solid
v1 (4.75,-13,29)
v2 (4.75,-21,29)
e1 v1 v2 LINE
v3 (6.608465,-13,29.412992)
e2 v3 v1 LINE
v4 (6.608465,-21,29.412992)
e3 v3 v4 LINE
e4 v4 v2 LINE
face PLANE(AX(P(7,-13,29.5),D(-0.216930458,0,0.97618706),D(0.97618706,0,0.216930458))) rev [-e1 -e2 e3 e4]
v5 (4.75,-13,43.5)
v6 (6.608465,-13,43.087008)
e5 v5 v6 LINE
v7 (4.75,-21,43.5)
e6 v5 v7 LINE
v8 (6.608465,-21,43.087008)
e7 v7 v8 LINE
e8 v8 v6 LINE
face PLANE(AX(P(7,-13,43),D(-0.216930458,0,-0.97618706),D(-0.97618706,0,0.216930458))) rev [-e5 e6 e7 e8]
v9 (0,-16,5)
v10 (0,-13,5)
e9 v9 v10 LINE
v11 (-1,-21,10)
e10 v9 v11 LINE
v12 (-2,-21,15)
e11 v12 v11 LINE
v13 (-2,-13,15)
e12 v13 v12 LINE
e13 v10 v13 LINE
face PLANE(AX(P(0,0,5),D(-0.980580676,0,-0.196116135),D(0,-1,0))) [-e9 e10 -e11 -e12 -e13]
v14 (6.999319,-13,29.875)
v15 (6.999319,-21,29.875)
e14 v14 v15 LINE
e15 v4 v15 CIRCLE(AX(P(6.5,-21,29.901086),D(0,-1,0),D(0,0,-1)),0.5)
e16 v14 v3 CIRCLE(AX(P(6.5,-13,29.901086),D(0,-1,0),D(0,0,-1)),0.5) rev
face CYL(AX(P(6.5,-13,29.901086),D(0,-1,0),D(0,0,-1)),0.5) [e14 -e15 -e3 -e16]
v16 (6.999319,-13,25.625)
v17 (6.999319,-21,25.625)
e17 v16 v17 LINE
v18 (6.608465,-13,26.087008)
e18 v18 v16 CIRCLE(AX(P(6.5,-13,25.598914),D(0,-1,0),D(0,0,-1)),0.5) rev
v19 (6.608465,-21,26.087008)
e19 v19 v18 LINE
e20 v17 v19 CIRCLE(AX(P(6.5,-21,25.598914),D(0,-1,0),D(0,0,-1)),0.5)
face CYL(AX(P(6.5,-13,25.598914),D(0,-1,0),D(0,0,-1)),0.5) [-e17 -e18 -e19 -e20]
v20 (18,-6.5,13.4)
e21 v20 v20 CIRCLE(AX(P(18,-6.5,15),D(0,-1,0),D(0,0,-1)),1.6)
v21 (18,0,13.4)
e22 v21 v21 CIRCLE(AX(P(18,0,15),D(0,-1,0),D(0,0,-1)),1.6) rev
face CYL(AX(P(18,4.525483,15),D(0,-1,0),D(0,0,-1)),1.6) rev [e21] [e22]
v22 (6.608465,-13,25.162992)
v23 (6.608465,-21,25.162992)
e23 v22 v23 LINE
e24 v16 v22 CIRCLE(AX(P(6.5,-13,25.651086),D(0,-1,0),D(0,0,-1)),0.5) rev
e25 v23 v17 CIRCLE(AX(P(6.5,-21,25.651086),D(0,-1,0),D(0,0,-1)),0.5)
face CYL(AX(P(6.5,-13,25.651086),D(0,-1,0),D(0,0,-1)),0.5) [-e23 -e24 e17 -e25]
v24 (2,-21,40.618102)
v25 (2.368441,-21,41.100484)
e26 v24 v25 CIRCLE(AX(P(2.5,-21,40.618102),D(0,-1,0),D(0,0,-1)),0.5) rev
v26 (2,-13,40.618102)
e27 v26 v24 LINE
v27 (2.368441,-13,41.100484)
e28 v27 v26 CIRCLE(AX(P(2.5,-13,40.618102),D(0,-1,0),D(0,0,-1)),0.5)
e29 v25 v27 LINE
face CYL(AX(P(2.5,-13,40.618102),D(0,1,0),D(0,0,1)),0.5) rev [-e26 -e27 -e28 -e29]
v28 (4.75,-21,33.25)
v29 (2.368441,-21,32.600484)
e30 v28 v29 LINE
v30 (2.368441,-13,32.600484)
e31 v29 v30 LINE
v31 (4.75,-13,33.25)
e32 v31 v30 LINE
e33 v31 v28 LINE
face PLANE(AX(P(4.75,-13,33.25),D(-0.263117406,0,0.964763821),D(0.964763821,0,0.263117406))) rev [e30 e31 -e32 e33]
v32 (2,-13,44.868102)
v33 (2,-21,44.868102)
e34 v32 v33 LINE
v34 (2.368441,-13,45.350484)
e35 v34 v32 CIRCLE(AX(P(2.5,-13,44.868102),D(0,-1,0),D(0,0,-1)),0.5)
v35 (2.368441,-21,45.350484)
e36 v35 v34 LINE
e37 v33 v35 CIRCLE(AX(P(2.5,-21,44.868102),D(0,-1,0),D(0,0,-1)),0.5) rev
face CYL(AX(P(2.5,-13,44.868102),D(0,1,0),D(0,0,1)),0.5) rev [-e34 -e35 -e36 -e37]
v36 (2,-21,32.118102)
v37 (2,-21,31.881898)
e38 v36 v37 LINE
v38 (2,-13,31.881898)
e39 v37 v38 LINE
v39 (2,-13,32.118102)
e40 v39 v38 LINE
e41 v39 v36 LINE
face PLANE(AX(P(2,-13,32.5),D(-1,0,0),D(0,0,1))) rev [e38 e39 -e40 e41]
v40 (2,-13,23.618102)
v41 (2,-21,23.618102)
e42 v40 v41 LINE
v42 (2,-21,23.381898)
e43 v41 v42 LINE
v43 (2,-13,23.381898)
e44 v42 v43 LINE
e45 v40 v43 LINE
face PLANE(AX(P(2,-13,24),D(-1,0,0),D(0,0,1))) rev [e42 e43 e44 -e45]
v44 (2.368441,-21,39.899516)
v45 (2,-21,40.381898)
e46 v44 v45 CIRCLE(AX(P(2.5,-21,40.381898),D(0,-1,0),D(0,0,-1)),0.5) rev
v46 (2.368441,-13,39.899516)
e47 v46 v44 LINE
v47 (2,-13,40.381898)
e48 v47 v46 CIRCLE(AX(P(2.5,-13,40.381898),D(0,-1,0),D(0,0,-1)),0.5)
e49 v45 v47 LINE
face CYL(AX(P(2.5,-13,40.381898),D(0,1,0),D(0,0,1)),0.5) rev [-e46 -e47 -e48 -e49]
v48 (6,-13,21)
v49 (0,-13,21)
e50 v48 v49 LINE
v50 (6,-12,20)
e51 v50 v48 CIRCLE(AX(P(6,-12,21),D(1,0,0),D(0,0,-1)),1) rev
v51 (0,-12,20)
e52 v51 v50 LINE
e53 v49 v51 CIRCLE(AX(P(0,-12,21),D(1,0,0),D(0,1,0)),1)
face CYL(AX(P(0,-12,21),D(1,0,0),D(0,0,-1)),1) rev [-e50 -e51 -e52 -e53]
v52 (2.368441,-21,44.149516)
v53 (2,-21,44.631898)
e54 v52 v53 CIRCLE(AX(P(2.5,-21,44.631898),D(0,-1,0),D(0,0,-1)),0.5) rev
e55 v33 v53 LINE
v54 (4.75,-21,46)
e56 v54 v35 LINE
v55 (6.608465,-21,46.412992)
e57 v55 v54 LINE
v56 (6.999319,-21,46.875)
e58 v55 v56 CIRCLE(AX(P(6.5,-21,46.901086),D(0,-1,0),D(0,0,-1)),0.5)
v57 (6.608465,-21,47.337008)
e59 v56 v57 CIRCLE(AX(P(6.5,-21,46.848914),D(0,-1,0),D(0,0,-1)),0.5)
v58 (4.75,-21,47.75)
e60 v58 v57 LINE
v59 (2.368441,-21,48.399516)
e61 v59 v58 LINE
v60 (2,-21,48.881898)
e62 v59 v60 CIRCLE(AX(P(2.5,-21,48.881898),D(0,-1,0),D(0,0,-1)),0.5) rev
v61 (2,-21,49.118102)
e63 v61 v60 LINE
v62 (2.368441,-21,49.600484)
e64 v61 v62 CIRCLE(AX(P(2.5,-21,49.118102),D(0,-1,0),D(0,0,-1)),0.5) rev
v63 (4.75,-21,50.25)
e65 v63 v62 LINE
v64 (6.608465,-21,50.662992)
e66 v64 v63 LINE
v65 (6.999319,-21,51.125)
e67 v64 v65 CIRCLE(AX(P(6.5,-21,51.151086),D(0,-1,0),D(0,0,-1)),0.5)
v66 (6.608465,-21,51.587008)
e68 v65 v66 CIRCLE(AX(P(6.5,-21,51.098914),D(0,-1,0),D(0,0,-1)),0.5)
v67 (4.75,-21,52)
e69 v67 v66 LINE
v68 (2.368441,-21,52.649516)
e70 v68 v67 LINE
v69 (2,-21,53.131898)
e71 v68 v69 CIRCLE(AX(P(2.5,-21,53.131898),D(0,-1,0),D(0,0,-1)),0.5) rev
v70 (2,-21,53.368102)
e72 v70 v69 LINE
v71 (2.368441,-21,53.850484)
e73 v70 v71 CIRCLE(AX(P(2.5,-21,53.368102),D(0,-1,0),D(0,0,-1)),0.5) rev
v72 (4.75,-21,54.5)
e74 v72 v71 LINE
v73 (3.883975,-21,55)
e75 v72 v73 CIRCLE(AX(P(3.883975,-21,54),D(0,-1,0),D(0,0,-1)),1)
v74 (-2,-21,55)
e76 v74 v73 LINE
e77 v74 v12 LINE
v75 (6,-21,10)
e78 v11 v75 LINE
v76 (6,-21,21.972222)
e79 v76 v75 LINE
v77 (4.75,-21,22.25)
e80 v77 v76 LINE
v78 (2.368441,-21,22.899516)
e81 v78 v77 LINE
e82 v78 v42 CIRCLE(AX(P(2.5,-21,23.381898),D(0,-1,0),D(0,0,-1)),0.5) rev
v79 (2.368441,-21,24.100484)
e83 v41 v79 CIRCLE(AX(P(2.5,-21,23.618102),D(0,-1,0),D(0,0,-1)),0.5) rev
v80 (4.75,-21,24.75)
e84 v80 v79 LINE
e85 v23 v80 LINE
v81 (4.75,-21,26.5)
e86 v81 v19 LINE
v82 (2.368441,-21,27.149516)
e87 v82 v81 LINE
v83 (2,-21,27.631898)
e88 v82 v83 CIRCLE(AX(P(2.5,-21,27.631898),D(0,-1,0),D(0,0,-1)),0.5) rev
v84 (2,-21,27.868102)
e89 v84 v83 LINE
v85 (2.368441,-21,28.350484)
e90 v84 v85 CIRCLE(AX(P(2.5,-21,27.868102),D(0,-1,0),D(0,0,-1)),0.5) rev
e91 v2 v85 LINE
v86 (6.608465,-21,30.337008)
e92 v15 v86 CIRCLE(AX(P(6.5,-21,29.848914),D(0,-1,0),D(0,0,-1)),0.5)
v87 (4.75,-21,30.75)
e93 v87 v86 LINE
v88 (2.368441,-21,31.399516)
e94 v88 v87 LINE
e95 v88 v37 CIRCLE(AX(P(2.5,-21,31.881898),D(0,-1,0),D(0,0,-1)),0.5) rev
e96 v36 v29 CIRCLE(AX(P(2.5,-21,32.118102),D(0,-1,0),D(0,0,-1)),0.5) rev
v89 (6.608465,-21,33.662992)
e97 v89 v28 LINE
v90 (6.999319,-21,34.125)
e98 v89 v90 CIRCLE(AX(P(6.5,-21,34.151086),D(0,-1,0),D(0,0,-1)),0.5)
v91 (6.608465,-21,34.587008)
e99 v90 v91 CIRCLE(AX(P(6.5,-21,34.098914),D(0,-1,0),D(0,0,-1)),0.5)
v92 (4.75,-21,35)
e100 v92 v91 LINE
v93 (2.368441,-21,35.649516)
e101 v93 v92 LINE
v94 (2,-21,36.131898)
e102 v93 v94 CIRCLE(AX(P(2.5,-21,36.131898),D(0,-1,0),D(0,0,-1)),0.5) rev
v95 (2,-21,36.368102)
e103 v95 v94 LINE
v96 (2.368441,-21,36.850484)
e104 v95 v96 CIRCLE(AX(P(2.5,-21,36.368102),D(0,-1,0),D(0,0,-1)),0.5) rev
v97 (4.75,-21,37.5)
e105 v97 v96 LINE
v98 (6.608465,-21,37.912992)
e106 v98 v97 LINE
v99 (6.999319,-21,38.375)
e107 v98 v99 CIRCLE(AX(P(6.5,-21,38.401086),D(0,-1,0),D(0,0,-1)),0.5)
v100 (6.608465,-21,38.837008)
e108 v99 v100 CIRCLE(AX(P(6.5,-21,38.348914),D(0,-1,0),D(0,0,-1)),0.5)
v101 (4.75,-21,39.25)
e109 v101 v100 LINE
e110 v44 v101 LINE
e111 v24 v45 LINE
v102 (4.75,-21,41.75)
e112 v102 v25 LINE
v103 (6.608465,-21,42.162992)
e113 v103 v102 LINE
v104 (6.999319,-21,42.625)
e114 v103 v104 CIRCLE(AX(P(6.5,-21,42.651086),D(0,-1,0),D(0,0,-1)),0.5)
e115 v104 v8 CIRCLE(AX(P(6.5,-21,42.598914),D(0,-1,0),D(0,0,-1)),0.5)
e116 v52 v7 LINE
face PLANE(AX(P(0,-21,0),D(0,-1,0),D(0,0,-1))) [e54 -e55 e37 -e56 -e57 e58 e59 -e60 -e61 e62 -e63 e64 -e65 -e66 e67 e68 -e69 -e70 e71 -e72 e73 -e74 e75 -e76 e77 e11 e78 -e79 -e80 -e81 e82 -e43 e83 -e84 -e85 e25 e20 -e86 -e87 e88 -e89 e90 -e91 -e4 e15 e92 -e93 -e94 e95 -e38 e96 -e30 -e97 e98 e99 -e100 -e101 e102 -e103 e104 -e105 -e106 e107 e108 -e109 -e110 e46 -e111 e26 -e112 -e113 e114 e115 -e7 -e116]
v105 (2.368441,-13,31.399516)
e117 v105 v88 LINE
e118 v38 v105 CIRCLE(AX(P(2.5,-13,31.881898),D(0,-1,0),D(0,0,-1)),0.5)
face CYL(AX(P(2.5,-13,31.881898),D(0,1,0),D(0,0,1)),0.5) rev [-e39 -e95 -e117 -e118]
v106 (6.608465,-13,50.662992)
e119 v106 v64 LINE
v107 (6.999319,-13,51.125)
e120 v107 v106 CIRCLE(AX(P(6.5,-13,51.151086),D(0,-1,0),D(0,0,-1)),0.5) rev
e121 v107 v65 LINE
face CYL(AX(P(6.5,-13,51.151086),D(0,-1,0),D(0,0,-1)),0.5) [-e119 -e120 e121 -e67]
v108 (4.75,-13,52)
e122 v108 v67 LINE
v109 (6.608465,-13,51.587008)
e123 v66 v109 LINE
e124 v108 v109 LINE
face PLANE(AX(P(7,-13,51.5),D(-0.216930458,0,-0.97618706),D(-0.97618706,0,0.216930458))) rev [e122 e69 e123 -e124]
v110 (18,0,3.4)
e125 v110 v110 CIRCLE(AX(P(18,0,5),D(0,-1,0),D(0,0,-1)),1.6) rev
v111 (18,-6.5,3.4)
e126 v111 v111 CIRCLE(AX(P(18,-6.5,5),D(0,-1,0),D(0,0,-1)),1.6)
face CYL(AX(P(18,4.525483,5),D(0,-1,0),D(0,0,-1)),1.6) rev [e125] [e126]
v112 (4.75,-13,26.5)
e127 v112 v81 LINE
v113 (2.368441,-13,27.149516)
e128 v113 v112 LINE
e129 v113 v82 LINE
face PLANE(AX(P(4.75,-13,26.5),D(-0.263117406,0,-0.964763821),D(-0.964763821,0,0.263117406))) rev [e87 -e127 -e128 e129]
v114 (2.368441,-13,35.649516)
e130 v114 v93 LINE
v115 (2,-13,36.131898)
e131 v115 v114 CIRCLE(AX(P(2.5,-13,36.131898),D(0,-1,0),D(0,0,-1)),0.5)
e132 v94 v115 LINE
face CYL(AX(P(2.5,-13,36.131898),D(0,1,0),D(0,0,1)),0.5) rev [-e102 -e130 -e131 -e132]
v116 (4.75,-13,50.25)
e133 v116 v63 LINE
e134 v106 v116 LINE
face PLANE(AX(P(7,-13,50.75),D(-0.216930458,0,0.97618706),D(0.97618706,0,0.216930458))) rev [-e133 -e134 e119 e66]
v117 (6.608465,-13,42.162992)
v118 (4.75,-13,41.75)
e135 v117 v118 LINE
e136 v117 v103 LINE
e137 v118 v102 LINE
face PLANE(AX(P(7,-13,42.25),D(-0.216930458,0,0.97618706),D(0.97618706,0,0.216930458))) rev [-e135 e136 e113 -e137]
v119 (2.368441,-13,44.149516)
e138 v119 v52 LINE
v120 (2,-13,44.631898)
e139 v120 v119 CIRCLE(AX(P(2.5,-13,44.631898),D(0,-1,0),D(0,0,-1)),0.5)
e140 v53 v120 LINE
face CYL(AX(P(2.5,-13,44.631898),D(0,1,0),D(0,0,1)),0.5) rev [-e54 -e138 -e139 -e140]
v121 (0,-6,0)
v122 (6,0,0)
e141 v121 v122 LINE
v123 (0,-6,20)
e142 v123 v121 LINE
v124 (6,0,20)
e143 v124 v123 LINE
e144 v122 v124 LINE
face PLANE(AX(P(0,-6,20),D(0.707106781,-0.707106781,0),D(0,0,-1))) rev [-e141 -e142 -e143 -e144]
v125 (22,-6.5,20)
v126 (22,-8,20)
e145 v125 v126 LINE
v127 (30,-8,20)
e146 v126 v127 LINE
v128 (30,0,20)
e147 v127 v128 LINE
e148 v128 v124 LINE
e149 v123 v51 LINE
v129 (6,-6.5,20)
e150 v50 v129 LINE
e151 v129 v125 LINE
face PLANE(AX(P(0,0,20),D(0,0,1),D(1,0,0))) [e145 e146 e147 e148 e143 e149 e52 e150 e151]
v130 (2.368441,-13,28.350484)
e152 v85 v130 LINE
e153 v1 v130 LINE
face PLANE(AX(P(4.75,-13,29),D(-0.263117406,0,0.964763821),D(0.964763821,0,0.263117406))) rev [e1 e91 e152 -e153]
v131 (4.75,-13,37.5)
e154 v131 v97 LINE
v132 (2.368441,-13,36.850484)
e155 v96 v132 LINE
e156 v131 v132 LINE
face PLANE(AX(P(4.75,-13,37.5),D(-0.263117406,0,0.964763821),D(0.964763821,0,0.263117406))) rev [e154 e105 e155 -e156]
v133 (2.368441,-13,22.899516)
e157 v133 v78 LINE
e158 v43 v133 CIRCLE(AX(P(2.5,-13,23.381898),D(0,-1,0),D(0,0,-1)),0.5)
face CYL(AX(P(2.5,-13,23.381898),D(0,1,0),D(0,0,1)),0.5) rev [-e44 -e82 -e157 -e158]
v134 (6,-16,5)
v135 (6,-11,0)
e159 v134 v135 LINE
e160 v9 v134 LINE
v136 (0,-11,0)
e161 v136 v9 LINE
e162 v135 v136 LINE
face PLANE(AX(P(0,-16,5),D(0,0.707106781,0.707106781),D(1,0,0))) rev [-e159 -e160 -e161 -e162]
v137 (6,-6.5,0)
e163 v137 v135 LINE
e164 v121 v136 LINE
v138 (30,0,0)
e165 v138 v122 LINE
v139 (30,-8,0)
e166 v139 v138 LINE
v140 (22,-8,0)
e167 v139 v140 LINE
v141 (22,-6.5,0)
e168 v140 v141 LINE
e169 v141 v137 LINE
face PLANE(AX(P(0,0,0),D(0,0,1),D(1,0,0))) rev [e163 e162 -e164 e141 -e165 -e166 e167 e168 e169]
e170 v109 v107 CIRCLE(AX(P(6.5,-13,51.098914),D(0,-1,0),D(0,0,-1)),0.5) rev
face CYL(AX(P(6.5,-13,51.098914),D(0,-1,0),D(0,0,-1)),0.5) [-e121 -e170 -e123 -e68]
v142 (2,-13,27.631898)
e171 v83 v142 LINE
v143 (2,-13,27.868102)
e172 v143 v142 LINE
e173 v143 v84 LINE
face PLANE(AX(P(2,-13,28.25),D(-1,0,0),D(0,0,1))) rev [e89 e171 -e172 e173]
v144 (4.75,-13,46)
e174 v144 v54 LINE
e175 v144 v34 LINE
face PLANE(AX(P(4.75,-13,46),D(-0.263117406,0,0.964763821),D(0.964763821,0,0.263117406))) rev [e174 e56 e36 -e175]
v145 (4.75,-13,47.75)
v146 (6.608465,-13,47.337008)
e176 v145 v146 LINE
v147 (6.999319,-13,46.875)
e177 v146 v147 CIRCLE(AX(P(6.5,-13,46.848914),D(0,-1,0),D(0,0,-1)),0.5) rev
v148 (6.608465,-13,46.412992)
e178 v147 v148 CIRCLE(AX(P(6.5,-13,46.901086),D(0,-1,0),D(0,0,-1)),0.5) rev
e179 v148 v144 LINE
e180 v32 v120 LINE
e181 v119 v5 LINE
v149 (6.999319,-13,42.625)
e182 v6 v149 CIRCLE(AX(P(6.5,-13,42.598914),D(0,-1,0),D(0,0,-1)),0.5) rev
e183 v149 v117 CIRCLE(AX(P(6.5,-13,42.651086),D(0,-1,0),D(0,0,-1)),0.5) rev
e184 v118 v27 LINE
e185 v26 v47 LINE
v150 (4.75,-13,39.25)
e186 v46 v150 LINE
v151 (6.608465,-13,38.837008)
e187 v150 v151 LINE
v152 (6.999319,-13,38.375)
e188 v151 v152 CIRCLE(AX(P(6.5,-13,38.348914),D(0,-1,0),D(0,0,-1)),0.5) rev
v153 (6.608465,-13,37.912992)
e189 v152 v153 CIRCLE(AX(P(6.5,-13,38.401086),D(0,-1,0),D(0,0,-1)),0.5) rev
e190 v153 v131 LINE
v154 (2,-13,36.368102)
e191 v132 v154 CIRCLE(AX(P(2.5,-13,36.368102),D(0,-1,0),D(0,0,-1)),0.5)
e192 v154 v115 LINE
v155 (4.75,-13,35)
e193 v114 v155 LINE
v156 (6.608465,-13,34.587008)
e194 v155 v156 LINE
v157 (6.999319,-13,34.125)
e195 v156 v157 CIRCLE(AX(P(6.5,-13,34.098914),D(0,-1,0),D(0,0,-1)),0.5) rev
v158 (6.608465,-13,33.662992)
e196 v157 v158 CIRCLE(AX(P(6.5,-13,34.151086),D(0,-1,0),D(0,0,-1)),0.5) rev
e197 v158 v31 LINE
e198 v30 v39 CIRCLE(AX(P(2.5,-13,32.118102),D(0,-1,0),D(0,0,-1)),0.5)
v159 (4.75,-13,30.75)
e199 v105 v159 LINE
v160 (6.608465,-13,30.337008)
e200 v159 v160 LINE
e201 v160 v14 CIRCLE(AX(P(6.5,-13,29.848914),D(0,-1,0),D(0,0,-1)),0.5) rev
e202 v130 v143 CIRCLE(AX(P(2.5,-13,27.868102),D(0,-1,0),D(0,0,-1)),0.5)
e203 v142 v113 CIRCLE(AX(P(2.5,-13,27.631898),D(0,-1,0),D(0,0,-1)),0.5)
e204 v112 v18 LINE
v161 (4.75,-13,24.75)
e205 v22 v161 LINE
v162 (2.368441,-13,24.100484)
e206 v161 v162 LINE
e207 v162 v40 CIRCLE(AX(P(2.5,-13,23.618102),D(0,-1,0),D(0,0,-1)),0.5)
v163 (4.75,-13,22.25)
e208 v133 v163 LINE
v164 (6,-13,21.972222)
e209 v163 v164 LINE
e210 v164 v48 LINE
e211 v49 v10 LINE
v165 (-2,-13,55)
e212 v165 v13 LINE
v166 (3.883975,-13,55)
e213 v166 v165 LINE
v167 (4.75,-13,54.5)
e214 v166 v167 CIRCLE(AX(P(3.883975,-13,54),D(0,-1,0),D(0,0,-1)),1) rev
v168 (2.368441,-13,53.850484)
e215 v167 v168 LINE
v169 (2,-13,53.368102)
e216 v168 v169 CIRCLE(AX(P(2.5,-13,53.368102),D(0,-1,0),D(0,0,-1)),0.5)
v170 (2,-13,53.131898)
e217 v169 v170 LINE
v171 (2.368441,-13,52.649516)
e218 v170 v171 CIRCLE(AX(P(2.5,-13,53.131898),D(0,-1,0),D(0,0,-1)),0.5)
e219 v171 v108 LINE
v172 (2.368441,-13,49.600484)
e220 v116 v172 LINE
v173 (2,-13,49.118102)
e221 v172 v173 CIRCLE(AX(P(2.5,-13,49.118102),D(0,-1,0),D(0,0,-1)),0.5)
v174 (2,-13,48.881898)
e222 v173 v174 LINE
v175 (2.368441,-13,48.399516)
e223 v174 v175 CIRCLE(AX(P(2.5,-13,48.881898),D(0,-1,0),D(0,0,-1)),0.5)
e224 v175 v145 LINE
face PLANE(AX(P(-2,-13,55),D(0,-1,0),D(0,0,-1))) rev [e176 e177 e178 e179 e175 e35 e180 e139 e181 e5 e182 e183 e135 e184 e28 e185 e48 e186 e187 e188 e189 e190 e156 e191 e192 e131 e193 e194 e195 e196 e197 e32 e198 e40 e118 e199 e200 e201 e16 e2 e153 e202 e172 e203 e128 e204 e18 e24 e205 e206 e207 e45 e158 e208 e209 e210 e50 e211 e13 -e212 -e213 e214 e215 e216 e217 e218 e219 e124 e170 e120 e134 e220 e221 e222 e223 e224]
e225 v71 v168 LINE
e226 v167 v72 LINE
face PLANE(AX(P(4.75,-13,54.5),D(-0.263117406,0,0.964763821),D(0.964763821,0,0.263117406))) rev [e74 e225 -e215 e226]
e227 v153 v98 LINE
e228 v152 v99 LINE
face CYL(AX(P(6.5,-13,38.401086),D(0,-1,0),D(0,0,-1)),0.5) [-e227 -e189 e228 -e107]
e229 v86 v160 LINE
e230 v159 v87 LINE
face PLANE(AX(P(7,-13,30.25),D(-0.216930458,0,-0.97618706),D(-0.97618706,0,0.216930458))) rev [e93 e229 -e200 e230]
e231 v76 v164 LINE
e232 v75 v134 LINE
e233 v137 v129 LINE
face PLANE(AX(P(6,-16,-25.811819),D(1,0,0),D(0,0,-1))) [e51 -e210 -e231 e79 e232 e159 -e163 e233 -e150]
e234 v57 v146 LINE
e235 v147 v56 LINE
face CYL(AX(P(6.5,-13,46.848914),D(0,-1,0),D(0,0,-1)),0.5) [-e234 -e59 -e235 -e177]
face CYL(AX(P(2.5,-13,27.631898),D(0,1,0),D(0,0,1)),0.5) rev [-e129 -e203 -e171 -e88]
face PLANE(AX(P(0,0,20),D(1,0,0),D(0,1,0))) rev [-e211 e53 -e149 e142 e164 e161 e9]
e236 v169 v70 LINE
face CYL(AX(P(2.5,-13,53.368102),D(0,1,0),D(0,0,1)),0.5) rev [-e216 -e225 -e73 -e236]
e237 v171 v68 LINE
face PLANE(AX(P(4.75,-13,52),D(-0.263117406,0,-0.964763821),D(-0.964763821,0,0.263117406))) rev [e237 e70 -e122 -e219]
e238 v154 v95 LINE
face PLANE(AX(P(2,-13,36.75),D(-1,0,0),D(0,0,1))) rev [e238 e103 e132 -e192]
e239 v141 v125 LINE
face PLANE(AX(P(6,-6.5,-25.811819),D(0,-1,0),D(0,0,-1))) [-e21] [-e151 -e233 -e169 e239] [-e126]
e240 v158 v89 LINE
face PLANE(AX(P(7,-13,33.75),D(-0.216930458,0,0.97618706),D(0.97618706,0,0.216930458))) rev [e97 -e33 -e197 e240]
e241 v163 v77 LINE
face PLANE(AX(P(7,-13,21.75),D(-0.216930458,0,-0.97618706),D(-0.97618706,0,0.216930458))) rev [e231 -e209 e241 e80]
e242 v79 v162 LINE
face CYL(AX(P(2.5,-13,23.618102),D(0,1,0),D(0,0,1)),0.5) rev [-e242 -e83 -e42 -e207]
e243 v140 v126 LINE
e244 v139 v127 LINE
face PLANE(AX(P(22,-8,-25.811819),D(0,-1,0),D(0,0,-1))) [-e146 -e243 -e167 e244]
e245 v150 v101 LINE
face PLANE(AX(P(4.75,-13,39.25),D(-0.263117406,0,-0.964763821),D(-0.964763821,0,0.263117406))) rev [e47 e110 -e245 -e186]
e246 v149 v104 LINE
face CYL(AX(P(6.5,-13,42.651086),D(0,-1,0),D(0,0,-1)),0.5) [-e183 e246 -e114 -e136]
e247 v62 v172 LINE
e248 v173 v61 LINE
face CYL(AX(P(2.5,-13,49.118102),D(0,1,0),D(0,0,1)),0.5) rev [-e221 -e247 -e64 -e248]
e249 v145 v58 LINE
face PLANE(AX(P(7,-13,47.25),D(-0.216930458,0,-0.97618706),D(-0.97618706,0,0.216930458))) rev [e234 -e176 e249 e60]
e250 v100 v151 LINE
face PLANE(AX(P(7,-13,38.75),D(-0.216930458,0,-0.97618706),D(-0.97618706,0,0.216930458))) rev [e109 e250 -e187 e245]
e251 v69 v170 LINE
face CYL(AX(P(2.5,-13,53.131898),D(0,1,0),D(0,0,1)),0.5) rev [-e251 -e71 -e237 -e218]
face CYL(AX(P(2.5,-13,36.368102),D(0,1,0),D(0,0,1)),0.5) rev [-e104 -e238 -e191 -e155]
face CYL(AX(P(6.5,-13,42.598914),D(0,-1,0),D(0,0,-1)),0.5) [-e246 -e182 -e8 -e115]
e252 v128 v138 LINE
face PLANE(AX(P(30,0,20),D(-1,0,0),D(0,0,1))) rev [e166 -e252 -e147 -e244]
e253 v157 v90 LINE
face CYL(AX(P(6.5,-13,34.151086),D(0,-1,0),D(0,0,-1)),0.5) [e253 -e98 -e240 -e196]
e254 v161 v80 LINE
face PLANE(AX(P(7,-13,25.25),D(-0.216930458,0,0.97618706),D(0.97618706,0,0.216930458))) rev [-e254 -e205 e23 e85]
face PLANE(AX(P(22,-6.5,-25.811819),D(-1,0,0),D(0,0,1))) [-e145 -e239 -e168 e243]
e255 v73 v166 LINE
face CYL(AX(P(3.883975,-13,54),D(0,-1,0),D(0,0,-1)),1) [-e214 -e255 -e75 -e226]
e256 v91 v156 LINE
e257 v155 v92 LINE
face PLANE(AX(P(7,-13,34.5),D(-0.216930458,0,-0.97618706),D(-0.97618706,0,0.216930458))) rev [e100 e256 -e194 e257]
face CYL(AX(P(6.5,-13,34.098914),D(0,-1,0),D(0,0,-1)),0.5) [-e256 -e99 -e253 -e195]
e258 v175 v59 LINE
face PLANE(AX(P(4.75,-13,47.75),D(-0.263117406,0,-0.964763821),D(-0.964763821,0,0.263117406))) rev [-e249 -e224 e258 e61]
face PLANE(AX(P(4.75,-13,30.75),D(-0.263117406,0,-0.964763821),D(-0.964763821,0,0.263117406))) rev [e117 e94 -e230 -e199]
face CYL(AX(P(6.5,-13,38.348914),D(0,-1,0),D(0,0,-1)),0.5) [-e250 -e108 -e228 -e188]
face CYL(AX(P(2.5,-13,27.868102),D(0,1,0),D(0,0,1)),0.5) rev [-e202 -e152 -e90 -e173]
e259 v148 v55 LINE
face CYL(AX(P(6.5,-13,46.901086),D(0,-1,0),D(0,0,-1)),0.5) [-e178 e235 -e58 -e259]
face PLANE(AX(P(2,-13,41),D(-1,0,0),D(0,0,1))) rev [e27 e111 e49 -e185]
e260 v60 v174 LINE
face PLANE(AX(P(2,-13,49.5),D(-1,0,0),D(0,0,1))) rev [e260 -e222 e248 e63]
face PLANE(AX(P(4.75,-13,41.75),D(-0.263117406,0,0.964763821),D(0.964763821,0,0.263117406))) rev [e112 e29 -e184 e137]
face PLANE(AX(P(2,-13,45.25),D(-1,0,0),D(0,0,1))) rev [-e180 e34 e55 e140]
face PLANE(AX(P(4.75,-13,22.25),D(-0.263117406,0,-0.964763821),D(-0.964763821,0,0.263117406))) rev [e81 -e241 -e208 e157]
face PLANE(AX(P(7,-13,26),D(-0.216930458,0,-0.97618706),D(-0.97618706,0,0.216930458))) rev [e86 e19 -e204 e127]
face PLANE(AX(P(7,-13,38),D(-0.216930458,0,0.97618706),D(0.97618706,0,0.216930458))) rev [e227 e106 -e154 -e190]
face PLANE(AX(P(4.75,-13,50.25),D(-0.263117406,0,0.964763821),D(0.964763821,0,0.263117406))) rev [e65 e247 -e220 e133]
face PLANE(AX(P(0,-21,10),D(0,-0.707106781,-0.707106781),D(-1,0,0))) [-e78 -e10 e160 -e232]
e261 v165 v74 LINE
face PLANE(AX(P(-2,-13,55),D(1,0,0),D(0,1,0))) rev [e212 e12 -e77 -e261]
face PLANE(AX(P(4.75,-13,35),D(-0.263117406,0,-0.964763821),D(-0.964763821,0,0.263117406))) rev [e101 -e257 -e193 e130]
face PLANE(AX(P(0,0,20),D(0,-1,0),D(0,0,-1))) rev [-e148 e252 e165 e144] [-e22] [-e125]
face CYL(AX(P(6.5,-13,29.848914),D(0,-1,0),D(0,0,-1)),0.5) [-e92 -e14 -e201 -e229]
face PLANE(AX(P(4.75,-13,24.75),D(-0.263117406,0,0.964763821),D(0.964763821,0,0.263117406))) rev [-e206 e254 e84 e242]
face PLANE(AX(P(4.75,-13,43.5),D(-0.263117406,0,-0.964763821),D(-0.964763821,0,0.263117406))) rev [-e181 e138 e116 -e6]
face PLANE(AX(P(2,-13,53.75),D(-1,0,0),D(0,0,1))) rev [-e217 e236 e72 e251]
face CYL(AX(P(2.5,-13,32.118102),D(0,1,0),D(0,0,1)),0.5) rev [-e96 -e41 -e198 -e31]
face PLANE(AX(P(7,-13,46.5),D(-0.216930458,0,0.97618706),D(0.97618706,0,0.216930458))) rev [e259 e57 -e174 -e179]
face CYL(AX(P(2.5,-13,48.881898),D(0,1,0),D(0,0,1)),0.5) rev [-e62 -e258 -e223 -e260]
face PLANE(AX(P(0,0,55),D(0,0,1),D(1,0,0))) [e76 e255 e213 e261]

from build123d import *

# Parameters (mm, degrees)
SKETCH1_W           = 30
SKETCH1_H           = 16
BOSS_EXTRUDE1_DEPTH = 20
CUT_EXTRUDE1_DEPTH  = 20
SKETCH3_W           = 6
SKETCH3_H           = 10
BOSS_EXTRUDE2_DEPTH = 5
SKETCH9_R           = 1.6
CUT_EXTRUDE3_DEPTH  = 6.5
SKETCH11_W          = 10
SKETCH11_H          = 8
BOSS_EXTRUDE4_DEPTH = 40
CHAMFER2_SIZE2      = 10
CHAMFER2_SIZE       = 2
FILLET1_R           = 1
CUT_EXTRUDE4_DEPTH  = 8
SKETCH13_W          = 2
SKETCH13_H          = 8
BOSS_EXTRUDE5_DEPTH = 10
LPATTERN1_COUNT     = 8
LPATTERN1_PITCH     = 4.25
FILLET2_R           = 0.5
FILLET3_R           = 1
SKETCH14_W          = 2
SKETCH14_H          = 8
CUT_EXTRUDE5_DEPTH  = 17
CHAMFER3_SIZE       = 6
CHAMFER4_SIZE       = 5


# Some blends are built 0.0001 mm under size
with BuildPart() as part:
    # Sketch1 → Boss-Extrude1 (new body)
    with BuildSketch(Plane.XY):
        with Locations((15, -8)):
            Rectangle(SKETCH1_W, SKETCH1_H)
    extrude(amount=BOSS_EXTRUDE1_DEPTH)

    # Sketch2 → Cut-Extrude1 (cut)
    with BuildSketch(Plane.XY.offset(20)):
        Polygon((22, -6.5), (22, -8), (30, -8), (30, -16), (6, -16), (6, -6.5), align=None)
    extrude(amount=-CUT_EXTRUDE1_DEPTH, mode=Mode.SUBTRACT)

    # Sketch3 → Boss-Extrude2 (add)
    with BuildSketch(Plane.XZ.offset(16)):
        with Locations((3, 10)):
            Rectangle(SKETCH3_W, SKETCH3_H)
    extrude(amount=BOSS_EXTRUDE2_DEPTH)

    # Sketch9 → Cut-Extrude3 (cut)
    with BuildSketch(Plane.XZ.offset(6.5)):
        with Locations(Location((18, 15, 0), (0, 0, 270))):
            Circle(SKETCH9_R)
        with Locations(Location((18, 5, 0), (0, 0, 270))):
            Circle(SKETCH9_R)
    extrude(amount=-CUT_EXTRUDE3_DEPTH, mode=Mode.SUBTRACT)

    # Sketch11 → Boss-Extrude4 (add)
    with BuildSketch(Plane.XY.offset(15)):
        with Locations((3, -17)):
            Rectangle(SKETCH11_W, SKETCH11_H)
    extrude(amount=BOSS_EXTRUDE4_DEPTH)

    # Chamfer2
    chamfer2_edges = [part.edges().sort_by_distance(p)[0] for p in [
        (0, -17, 15),
    ]]
    chamfer2_side = [part.faces().sort_by_distance(p)[0] for p in [
        (-0.04, -17, 15),
    ]]
    chamfer(chamfer2_edges, length=CHAMFER2_SIZE - 0.0001, length2=CHAMFER2_SIZE2 - 0.0001, reference=chamfer2_side[0])  # a hair under: the kernel refuses the full size

    # Fillet1
    fillet1_edges = [part.edges().sort_by_distance(p)[0] for p in [
        (3, -13, 20),
    ]]
    fillet(fillet1_edges, radius=FILLET1_R)

    # Sketch12 → Cut-Extrude4 (cut)
    with BuildSketch(Plane.XZ.offset(21)):
        Polygon((7, 55), (4.75, 54.5), (2, 53.75), (2, 52.75), (4.75, 52), (7, 51.5), (7, 50.75), (8, 50.75), (8, 55), align=None)
    cut_extrude4 = extrude(amount=-CUT_EXTRUDE4_DEPTH, mode=Mode.SUBTRACT)

    # Sketch13 → Boss-Extrude5 (add)
    with BuildSketch(Plane(origin=(0, 0, 15), x_dir=(-1, 0, 0), z_dir=(0, 0, -1))):
        with Locations((-7, -17)):
            Rectangle(SKETCH13_W, SKETCH13_H)
    extrude(amount=BOSS_EXTRUDE5_DEPTH)

    # LPattern1: Cut-Extrude4 ×8
    with Locations(*[(0, 0, -i * LPATTERN1_PITCH) for i in range(1, LPATTERN1_COUNT)]):
        add(cut_extrude4, mode=Mode.SUBTRACT)

    # Fillet2
    # the kernel refuses this fillet: 0.5 mm, written as the material it adds along each edge
    with BuildSketch(Plane(origin=(2, -21, 52.75), x_dir=(0.9647638212377322, 0, -0.26311740579210835), z_dir=(0, 1, 0)), Plane(origin=(2, -21, 53.75), x_dir=(0, 0, -1), z_dir=(0, 1, 0)), Plane(origin=(2, -21, 48.5), x_dir=(0.9647638212377321, 0, -0.26311740579210924), z_dir=(0, 1, 0)), Plane(origin=(2, -21, 49.5), x_dir=(0, 0, -1), z_dir=(0, 1, 0)), Plane(origin=(2, -21, 44.25), x_dir=(0.9647638212377321, 0, -0.26311740579210924), z_dir=(0, 1, 0)), Plane(origin=(2, -21, 45.25), x_dir=(0, 0, -1), z_dir=(0, 1, 0)), Plane(origin=(2, -21, 35.75), x_dir=(0.9647638212377321, 0, -0.26311740579210896), z_dir=(0, 1, 0)), Plane(origin=(2, -21, 36.75), x_dir=(0, 0, -1), z_dir=(0, 1, 0)), Plane(origin=(2, -21, 40), x_dir=(0.9647638212377321, 0, -0.26311740579210924), z_dir=(0, 1, 0)), Plane(origin=(2, -21, 41), x_dir=(0, 0, -1), z_dir=(0, 1, 0)), Plane(origin=(2, -21, 23), x_dir=(0.9647638212377319, 0, -0.2631174057921095), z_dir=(0, 1, 0)), Plane(origin=(2, -21, 24), x_dir=(0, 0, -1), z_dir=(0, 1, 0)), Plane(origin=(2, -21, 27.25), x_dir=(0.9647638212377319, 0, -0.2631174057921095), z_dir=(0, 1, 0)), Plane(origin=(2, -21, 28.25), x_dir=(0, 0, -1), z_dir=(0, 1, 0)), Plane(origin=(2, -21, 32.5), x_dir=(0, 0, -1), z_dir=(0, 1, 0)), Plane(origin=(2, -21, 31.5), x_dir=(0.9647638212377319, 0, -0.2631174057921095), z_dir=(0, 1, 0))) as fillet2_piece_1:
        with BuildLine():
            CenterArc((FILLET2_R * 0.763795840999, -FILLET2_R), FILLET2_R, 90, 74.744881297)
            Line((-FILLET2_R * 0.200967980239, -FILLET2_R * 0.736882594208), (0, 0))
            Line((0, 0), (FILLET2_R * 0.763795840999, 0))
        make_face()
    extrude(amount=8)
    # the kernel refuses this fillet: 0.5 mm, written as the material it takes off along each edge
    with BuildSketch(Plane(origin=(7, -22.002714508, 33.75), x_dir=(-0.9761870601839541, 0, -0.21693045781865056), z_dir=(0, 1, 0)), Plane(origin=(7, -22.002714508, 34.5), x_dir=(0, 0, -1), z_dir=(0, 1, 0)), Plane(origin=(7, -22.002714508, 38), x_dir=(-0.9761870601839535, 0, -0.21693045781865242), z_dir=(0, 1, 0)), Plane(origin=(7, -22.002714508, 38.75), x_dir=(0, 0, -1), z_dir=(0, 1, 0)), Plane(origin=(7, -22.002714508, 42.25), x_dir=(-0.9761870601839538, 0, -0.216930457818651), z_dir=(0, 1, 0)), Plane(origin=(7, -22.002714508, 43), x_dir=(0, 0, -1), z_dir=(0, 1, 0)), Plane(origin=(7, -22.002714508, 46.5), x_dir=(-0.9761870601839538, 0, -0.216930457818651), z_dir=(0, 1, 0)), Plane(origin=(7, -22.002714508, 47.25), x_dir=(0, 0, -1), z_dir=(0, 1, 0)), Plane(origin=(7, -22.002714508, 50.75), x_dir=(-0.9761870601839538, 0, -0.216930457818651), z_dir=(0, 1, 0)), Plane(origin=(7, -22.002714508, 51.5), x_dir=(0, 0, -1), z_dir=(0, 1, 0)), Plane(origin=(7, -22.002714508, 25.25), x_dir=(-0.9761870601839521, 0, -0.21693045781865947), z_dir=(0, 1, 0)), Plane(origin=(7, -22.002714508, 26), x_dir=(0, 0, -1), z_dir=(0, 1, 0)), Plane(origin=(7, -22.002714508, 29.5), x_dir=(-0.9761870601839522, 0, -0.2169304578186585), z_dir=(0, 1, 0)), Plane(origin=(7, -22.002714508, 30.25), x_dir=(0, 0, -1), z_dir=(0, 1, 0))) as fillet2_2_piece_1:
        with BuildLine():
            CenterArc((FILLET2_R * 0.802171606366, FILLET2_R), FILLET2_R, 192.528807709, 77.471192291)
            Line((-FILLET2_R * 0.174015453818, FILLET2_R * 0.783069542181), (0, 0))
            Line((0, 0), (FILLET2_R * 0.802171606366, 0))
        make_face()
    extrude(amount=10.005429016, mode=Mode.SUBTRACT)

    # Fillet3
    # the kernel refuses this fillet: 1 mm, written as the material it takes off along each edge
    with BuildSketch(Plane(origin=(7, -28.790063509, 55), x_dir=(-1, 0, 0), z_dir=(0, 1, 0))) as fillet3_piece_1:
        with BuildLine():
            CenterArc((3.116025404, -1), FILLET3_R, 90, 60)
            Line((2.25, -0.5), (0, 0))
            Line((0, 0), (3.116025404, 0))
        make_face()
    extrude(amount=23.580127019, mode=Mode.SUBTRACT)

    # Sketch14 → Cut-Extrude5 (cut)
    with BuildSketch(Plane(origin=(0, 0, 5), x_dir=(-1, 0, 0), z_dir=(0, 0, -1))):
        with Locations((-7, -17)):
            Rectangle(SKETCH14_W, SKETCH14_H)
    extrude(amount=-CUT_EXTRUDE5_DEPTH, mode=Mode.SUBTRACT)

    # Chamfer3
    chamfer3_edges = [part.edges().sort_by_distance(p)[0] for p in [
        (0, 0, 10),
    ]]
    chamfer(chamfer3_edges, length=CHAMFER3_SIZE)

    # Chamfer4
    chamfer4_edges = [part.edges().sort_by_distance(p)[0] for p in [
        (3, -21, 5),
        (3, -16, 0),
    ]]
    chamfer(chamfer4_edges, length=CHAMFER4_SIZE - 0.0001)  # a hair under: the kernel refuses the full size


solid = part.part
